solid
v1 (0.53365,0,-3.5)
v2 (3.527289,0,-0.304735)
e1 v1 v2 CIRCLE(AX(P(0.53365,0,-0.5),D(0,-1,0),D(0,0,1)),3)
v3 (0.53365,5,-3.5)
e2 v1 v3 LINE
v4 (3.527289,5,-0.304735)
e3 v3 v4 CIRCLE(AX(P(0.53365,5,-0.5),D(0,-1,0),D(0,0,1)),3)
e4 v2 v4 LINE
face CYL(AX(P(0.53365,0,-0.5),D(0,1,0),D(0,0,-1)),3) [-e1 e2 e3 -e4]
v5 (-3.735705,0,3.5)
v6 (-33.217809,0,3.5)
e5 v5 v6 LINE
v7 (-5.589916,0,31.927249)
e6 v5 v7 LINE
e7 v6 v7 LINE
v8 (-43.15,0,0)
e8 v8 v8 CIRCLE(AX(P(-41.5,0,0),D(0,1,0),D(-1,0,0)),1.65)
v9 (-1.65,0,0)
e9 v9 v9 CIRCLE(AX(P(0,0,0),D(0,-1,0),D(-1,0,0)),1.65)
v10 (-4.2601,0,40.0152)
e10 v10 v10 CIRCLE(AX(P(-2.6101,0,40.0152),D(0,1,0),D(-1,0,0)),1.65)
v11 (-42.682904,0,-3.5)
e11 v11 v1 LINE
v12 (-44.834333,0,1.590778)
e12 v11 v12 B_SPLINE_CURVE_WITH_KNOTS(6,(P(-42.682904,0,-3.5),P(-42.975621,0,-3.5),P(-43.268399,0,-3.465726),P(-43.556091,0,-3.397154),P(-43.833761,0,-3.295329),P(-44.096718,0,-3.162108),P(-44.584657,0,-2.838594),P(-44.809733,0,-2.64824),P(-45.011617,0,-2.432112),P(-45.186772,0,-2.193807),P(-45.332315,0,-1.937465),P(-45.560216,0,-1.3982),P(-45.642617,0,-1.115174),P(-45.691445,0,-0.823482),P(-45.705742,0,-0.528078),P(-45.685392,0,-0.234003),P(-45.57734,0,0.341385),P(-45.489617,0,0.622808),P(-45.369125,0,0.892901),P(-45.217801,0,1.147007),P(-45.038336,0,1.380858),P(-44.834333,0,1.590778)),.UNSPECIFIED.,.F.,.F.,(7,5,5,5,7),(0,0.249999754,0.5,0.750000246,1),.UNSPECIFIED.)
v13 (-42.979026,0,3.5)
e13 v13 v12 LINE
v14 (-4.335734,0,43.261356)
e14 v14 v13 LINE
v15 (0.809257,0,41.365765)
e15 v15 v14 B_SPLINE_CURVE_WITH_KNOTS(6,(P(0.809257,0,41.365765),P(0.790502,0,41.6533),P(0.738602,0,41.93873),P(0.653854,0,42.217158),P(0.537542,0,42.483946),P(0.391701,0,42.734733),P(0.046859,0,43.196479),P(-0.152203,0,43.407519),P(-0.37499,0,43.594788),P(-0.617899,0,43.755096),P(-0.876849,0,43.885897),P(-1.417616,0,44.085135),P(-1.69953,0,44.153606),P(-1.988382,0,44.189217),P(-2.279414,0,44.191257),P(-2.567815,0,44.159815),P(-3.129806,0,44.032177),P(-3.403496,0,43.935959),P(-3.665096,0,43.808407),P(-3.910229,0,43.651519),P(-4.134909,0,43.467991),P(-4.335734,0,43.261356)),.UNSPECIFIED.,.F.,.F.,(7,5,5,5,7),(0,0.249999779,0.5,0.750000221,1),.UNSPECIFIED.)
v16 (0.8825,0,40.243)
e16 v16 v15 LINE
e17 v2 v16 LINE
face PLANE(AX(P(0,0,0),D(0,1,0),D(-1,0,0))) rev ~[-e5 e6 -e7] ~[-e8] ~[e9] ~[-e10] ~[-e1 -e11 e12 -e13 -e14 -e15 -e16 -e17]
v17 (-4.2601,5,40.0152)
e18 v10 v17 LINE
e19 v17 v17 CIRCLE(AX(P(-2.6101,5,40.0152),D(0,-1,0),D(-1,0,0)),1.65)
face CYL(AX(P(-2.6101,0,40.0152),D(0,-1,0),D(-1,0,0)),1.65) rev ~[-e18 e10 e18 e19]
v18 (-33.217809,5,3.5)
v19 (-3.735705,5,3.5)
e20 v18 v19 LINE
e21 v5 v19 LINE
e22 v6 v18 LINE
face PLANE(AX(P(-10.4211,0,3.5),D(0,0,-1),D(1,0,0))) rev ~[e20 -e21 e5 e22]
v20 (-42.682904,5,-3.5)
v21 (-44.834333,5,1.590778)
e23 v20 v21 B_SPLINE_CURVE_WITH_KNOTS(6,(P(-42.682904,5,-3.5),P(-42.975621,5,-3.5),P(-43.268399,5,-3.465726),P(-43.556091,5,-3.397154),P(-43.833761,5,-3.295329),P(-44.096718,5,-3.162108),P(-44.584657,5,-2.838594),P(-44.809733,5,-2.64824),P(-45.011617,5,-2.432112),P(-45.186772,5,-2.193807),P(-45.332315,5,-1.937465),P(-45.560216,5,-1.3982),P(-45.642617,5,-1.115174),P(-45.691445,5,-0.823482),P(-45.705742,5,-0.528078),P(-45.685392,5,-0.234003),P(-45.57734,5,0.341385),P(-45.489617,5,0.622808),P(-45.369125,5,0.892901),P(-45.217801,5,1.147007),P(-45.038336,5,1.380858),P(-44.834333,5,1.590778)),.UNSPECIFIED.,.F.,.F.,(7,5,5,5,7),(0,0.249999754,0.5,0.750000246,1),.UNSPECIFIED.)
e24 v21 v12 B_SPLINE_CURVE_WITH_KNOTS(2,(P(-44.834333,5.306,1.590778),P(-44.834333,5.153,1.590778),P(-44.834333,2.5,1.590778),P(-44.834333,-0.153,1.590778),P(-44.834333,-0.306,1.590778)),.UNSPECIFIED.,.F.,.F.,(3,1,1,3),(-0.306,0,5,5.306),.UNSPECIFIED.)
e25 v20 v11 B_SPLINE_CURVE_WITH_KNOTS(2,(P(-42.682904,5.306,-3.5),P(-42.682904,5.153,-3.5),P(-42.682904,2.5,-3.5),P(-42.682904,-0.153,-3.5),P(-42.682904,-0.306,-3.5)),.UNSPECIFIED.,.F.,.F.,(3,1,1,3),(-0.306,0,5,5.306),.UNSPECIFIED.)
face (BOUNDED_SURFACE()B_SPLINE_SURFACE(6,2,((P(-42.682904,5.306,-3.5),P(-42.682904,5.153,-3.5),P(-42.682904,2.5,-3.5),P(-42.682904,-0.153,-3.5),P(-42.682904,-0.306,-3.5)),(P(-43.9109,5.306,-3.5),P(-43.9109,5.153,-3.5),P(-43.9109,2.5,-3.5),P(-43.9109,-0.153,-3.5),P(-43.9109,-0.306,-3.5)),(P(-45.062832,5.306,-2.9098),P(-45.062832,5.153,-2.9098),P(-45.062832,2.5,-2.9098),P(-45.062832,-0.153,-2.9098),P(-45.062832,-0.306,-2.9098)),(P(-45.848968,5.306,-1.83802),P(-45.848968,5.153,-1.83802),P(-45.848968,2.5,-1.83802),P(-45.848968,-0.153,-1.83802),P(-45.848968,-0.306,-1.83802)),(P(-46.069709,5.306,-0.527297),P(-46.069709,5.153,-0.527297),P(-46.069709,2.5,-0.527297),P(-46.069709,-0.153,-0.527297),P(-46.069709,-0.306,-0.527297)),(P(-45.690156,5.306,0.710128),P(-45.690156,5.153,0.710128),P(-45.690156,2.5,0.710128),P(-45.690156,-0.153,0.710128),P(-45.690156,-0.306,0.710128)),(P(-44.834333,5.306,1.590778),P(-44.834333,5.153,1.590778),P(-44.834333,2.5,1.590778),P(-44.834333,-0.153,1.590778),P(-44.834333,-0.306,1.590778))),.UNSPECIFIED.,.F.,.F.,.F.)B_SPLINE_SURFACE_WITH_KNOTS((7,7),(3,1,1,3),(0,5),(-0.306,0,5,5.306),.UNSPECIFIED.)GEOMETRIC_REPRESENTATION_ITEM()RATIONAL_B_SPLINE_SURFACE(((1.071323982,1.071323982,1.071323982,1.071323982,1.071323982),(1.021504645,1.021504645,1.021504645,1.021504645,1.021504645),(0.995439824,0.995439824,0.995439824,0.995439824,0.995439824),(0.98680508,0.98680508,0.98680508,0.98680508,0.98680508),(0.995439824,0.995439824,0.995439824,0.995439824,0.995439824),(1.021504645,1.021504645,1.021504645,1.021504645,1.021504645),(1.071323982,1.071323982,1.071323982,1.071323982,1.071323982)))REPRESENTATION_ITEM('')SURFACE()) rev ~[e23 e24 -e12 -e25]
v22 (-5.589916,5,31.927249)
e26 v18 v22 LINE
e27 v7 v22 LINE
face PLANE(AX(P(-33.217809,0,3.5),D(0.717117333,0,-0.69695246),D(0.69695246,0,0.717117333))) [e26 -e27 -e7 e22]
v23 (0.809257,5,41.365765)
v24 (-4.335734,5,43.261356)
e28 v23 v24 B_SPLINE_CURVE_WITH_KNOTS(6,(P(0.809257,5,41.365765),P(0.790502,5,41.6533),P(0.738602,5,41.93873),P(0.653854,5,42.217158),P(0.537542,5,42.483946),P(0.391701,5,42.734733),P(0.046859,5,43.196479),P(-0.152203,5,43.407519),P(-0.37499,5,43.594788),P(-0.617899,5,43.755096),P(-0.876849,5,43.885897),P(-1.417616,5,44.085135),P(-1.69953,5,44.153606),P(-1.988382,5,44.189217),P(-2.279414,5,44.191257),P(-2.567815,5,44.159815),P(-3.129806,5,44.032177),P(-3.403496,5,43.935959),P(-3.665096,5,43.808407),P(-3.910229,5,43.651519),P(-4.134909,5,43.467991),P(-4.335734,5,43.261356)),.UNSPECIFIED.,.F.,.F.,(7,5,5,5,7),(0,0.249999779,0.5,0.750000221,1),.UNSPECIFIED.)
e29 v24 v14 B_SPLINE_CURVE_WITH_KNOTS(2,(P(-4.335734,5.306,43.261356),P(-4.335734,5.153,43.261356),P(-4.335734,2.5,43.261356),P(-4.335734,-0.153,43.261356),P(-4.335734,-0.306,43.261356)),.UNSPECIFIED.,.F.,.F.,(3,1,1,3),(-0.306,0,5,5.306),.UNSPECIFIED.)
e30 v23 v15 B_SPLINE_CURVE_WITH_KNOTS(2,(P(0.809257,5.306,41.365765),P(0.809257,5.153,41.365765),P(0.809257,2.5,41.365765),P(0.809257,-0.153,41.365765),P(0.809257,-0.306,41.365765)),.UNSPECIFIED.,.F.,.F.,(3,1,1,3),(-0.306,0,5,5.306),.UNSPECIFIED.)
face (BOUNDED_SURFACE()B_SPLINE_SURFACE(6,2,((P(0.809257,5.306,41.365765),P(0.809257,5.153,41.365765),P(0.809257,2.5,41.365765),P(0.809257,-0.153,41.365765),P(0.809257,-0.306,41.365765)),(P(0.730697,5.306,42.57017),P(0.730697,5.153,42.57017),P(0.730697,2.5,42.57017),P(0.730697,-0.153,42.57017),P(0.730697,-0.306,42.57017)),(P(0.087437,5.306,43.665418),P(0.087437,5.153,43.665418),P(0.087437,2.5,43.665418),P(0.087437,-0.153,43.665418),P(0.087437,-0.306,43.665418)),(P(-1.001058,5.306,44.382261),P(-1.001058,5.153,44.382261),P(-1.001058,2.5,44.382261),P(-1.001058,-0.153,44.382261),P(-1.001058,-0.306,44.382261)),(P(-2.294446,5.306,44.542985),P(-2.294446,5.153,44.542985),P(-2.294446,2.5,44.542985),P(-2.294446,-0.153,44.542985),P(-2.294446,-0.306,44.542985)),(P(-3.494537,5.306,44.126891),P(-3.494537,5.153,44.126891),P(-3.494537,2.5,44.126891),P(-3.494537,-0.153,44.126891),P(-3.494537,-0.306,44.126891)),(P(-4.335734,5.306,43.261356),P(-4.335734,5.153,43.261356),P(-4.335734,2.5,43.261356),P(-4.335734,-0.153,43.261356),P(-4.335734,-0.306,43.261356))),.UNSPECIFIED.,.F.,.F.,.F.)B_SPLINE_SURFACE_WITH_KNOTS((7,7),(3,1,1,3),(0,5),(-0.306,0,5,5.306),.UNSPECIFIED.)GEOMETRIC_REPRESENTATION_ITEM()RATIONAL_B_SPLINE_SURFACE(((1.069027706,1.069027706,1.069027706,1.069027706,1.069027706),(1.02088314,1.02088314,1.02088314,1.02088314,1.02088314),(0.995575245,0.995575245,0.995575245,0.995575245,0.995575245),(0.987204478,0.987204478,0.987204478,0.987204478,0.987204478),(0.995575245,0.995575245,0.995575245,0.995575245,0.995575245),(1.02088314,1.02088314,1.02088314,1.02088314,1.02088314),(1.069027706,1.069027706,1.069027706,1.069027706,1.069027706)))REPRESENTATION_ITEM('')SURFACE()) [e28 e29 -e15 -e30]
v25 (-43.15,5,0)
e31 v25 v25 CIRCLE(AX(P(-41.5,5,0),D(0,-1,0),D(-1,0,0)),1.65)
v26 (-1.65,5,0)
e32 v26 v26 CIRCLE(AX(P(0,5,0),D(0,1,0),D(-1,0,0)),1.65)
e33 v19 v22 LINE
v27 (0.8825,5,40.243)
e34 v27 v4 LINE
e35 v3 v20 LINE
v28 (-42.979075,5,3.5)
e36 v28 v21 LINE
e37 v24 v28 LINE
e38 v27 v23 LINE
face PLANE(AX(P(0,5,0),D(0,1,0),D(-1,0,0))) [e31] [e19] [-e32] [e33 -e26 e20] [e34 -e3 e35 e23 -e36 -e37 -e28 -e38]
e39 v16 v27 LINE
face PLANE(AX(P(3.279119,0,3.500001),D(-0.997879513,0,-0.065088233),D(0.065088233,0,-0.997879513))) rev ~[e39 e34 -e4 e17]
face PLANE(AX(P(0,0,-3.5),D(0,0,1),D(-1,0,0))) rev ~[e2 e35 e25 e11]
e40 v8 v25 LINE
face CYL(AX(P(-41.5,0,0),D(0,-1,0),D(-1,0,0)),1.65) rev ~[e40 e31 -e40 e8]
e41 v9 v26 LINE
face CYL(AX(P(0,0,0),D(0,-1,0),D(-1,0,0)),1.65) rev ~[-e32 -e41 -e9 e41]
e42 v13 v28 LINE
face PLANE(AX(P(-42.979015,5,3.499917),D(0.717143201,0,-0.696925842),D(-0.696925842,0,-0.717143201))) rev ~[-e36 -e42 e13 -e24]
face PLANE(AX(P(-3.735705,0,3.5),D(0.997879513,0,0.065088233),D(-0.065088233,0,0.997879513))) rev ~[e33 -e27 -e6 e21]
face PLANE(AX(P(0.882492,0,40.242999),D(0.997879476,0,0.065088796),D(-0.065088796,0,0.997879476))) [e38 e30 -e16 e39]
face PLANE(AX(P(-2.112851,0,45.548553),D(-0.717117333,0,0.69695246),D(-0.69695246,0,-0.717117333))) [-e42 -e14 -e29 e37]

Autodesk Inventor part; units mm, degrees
ref_plane "YZ Plane" through (0, 0, 0) normal (1, 0, 0) x (0, 1, 0)
ref_plane "XZ Plane" through (0, 0, 0) normal (0, 1, 0) x (-1, 0, 0)
ref_plane "XY Plane" through (0, 0, 0) normal (0, 0, 1) x (1, 0, 0)
sketch "Sketch1" plane through (0, 0, 0) normal (0, 1, 0) x (-1, 0, 0)
  line L0 (0, 0) -> (41.5, 0)
  line L1 (41.5, 0) -> (2.6101, 40.0152)
  line L2 (2.6101, 40.0152) -> (0, 0)
  line L3 (-38.7898, 77.591) -> (-33.77, 82.4696)
  line L4 (-33.77, 82.4696) -> (44.0099, 2.4393)
  line L5 (44.0099, 2.4393) -> (38.9901, -2.4393)
  line L6 (38.9901, -2.4393) -> (-38.7898, 77.591)
  line L7 (-38.7898, 77.591) -> (44.0099, 2.4393) construction
  line L8 (-33.77, 82.4696) -> (38.9901, -2.4393) construction
  line L9 (83, -3.5) -> (83, 3.5)
  line L10 (83, 3.5) -> (0, 3.5)
  line L11 (0, 3.5) -> (0, -3.5)
  line L12 (0, -3.5) -> (83, -3.5)
  line L13 (83, -3.5) -> (0, 3.5) construction
  line L14 (83, 3.5) -> (0, -3.5) construction
  line L15 (-6.1026, -39.7873) -> (0.8825, -40.243)
  line L16 (0.8825, -40.243) -> (6.1026, 39.7873)
  line L17 (6.1026, 39.7873) -> (-0.8825, 40.243)
  line L18 (-0.8825, 40.243) -> (-6.1026, -39.7873)
  line L19 (-6.1026, -39.7873) -> (6.1026, 39.7873) construction
  line L20 (0.8825, -40.243) -> (-0.8825, 40.243) construction
  circle A0 centre (0, 0) radius 1.65
  circle A1 centre (2.6101, 40.0152) radius 1.65
  circle A2 centre (41.5, 0) radius 1.65
  line L21 (2.6101, 40.0152) -> (-2.6009, 40.355)
  line L22 (-1.2742, 34.2377) -> (-0.3698, 48.1031)
  line L23 (-0.3698, 48.1031) -> (-5.0836, 42.9096)
  line L24 (-2.6009, 40.355) -> (2.1129, 45.5486)
  line L25 (6.5967, -3.5) -> (-3.7357, -3.5)
  line L26 (10.4211, 3.5) -> (-3.2791, 3.5)
  line L27 (44.9726, 3.5) -> (44.9726, -3.5731)
  point P0 (33.2178, 3.5)
  point P1 (3.7357, 3.5)
  point P2 (5.5899, 31.9272)
  point P3 (42.9791, 3.5)
  point P4 (-0.7416, 42.4036)
  point P5 (44.9726, -3.5)
  dimension "d0" = 41.5
  dimension "d1" = 55.8
  dimension "d2" = 45.817
  dimension "d3" = 7
  dimension "d4" = 7
  dimension "d5" = 7
  dimension "d6" = 3.3
  dimension "d7" = 3.3
  dimension "d8" = 3.3
extrude "Extrusion1" add sketch "Sketch1" along normal blind 5 contours A0 L2 L10 L16 L0 | L0 L16 L12 L11 A0 | A0 L11 L10 L2 | A0 L11 L25 L18 L26 | L16 L10 L6 L0 | L0 L6 L5 A2 L4 L10 L27 L12 L16 | L10 L26 L18 L6 L2 | L2 L6 L16 L10 | L6 L10 L1 A2 L0 | L0 A2 L5 L6 | L6 L18 L17 A1 L2 | L2 A1 L1 L16 L6 | L6 L16 L1 L10 | L1 L10 L4 L5 A2 | L1 L16 L17 A1 L22 L24 L4 L10 | L1 A1 L17 L16
sketch "Sketch2" plane through (0, 5, 0) normal (0, 1, 0) x (1, 0, 0)
  line L0 (-42.9791, -3.5) -> (-2.1129, -45.5486) projected
  line L1 (-41.9322, -4.5771) -> (-44.9726, -1.4485)
  line L2 (-44.9726, 3.5) -> (-44.9726, -3.5) projected
  line L3 (-41.9322, -4.5771) -> (-37.5696, -4.5771) construction
  line L4 (-44.9726, -1.4485) -> (-44.9726, -3.5)
  line L5 (-44.9726, -3.5) -> (-42.9791, -3.5)
  point P0 (0, 0)
  dimension "d11" = 134.18
extrude "Extrusion2" cut sketch "Sketch2" against normal blind 10
sketch "Sketch3" plane through (0, 5, 0) normal (0, 1, 0) x (1, 0, 0)
  line L0 (-44.9726, -1.4485) -> (-41.9322, -4.5771) projected
  line L1 (-44.9726, 3.5) -> (-44.9726, -1.4485)
  line L2 (-44.9726, -1.4485) -> (-44.9726, 3.5)
  line L3 (-44.9726, 3.5) -> (-53.5355, 3.5)
  line L4 (-41.9322, -4.5771) -> (-49.7814, 3.5)
  line L5 (-41.9322, -4.5771) -> (-2.1129, -45.5486) projected
  line L6 (-6.7195, -40.8087) -> (1.7936, -49.5681)
  line L7 (0.7416, -42.4036) -> (3.7357, 3.5) projected
  line L8 (0.9497, -39.2136) -> (0.3698, -48.1031)
  line L9 (-2.1129, -45.5486) -> (0.7416, -42.4036) projected
  line L10 (-2.1129, -45.5486) -> (0.7416, -42.4036)
  point P0 (0, 0)
extrude "Extrusion3" add sketch "Sketch3" against normal blind 5
fillet "Fillet1" radius 3 3 edges at (0.3698, 2.5, 48.1031) (-49.7814, 2.5, -3.5) (3.7357, 2.5, -3.5)
properties part number "bde"
